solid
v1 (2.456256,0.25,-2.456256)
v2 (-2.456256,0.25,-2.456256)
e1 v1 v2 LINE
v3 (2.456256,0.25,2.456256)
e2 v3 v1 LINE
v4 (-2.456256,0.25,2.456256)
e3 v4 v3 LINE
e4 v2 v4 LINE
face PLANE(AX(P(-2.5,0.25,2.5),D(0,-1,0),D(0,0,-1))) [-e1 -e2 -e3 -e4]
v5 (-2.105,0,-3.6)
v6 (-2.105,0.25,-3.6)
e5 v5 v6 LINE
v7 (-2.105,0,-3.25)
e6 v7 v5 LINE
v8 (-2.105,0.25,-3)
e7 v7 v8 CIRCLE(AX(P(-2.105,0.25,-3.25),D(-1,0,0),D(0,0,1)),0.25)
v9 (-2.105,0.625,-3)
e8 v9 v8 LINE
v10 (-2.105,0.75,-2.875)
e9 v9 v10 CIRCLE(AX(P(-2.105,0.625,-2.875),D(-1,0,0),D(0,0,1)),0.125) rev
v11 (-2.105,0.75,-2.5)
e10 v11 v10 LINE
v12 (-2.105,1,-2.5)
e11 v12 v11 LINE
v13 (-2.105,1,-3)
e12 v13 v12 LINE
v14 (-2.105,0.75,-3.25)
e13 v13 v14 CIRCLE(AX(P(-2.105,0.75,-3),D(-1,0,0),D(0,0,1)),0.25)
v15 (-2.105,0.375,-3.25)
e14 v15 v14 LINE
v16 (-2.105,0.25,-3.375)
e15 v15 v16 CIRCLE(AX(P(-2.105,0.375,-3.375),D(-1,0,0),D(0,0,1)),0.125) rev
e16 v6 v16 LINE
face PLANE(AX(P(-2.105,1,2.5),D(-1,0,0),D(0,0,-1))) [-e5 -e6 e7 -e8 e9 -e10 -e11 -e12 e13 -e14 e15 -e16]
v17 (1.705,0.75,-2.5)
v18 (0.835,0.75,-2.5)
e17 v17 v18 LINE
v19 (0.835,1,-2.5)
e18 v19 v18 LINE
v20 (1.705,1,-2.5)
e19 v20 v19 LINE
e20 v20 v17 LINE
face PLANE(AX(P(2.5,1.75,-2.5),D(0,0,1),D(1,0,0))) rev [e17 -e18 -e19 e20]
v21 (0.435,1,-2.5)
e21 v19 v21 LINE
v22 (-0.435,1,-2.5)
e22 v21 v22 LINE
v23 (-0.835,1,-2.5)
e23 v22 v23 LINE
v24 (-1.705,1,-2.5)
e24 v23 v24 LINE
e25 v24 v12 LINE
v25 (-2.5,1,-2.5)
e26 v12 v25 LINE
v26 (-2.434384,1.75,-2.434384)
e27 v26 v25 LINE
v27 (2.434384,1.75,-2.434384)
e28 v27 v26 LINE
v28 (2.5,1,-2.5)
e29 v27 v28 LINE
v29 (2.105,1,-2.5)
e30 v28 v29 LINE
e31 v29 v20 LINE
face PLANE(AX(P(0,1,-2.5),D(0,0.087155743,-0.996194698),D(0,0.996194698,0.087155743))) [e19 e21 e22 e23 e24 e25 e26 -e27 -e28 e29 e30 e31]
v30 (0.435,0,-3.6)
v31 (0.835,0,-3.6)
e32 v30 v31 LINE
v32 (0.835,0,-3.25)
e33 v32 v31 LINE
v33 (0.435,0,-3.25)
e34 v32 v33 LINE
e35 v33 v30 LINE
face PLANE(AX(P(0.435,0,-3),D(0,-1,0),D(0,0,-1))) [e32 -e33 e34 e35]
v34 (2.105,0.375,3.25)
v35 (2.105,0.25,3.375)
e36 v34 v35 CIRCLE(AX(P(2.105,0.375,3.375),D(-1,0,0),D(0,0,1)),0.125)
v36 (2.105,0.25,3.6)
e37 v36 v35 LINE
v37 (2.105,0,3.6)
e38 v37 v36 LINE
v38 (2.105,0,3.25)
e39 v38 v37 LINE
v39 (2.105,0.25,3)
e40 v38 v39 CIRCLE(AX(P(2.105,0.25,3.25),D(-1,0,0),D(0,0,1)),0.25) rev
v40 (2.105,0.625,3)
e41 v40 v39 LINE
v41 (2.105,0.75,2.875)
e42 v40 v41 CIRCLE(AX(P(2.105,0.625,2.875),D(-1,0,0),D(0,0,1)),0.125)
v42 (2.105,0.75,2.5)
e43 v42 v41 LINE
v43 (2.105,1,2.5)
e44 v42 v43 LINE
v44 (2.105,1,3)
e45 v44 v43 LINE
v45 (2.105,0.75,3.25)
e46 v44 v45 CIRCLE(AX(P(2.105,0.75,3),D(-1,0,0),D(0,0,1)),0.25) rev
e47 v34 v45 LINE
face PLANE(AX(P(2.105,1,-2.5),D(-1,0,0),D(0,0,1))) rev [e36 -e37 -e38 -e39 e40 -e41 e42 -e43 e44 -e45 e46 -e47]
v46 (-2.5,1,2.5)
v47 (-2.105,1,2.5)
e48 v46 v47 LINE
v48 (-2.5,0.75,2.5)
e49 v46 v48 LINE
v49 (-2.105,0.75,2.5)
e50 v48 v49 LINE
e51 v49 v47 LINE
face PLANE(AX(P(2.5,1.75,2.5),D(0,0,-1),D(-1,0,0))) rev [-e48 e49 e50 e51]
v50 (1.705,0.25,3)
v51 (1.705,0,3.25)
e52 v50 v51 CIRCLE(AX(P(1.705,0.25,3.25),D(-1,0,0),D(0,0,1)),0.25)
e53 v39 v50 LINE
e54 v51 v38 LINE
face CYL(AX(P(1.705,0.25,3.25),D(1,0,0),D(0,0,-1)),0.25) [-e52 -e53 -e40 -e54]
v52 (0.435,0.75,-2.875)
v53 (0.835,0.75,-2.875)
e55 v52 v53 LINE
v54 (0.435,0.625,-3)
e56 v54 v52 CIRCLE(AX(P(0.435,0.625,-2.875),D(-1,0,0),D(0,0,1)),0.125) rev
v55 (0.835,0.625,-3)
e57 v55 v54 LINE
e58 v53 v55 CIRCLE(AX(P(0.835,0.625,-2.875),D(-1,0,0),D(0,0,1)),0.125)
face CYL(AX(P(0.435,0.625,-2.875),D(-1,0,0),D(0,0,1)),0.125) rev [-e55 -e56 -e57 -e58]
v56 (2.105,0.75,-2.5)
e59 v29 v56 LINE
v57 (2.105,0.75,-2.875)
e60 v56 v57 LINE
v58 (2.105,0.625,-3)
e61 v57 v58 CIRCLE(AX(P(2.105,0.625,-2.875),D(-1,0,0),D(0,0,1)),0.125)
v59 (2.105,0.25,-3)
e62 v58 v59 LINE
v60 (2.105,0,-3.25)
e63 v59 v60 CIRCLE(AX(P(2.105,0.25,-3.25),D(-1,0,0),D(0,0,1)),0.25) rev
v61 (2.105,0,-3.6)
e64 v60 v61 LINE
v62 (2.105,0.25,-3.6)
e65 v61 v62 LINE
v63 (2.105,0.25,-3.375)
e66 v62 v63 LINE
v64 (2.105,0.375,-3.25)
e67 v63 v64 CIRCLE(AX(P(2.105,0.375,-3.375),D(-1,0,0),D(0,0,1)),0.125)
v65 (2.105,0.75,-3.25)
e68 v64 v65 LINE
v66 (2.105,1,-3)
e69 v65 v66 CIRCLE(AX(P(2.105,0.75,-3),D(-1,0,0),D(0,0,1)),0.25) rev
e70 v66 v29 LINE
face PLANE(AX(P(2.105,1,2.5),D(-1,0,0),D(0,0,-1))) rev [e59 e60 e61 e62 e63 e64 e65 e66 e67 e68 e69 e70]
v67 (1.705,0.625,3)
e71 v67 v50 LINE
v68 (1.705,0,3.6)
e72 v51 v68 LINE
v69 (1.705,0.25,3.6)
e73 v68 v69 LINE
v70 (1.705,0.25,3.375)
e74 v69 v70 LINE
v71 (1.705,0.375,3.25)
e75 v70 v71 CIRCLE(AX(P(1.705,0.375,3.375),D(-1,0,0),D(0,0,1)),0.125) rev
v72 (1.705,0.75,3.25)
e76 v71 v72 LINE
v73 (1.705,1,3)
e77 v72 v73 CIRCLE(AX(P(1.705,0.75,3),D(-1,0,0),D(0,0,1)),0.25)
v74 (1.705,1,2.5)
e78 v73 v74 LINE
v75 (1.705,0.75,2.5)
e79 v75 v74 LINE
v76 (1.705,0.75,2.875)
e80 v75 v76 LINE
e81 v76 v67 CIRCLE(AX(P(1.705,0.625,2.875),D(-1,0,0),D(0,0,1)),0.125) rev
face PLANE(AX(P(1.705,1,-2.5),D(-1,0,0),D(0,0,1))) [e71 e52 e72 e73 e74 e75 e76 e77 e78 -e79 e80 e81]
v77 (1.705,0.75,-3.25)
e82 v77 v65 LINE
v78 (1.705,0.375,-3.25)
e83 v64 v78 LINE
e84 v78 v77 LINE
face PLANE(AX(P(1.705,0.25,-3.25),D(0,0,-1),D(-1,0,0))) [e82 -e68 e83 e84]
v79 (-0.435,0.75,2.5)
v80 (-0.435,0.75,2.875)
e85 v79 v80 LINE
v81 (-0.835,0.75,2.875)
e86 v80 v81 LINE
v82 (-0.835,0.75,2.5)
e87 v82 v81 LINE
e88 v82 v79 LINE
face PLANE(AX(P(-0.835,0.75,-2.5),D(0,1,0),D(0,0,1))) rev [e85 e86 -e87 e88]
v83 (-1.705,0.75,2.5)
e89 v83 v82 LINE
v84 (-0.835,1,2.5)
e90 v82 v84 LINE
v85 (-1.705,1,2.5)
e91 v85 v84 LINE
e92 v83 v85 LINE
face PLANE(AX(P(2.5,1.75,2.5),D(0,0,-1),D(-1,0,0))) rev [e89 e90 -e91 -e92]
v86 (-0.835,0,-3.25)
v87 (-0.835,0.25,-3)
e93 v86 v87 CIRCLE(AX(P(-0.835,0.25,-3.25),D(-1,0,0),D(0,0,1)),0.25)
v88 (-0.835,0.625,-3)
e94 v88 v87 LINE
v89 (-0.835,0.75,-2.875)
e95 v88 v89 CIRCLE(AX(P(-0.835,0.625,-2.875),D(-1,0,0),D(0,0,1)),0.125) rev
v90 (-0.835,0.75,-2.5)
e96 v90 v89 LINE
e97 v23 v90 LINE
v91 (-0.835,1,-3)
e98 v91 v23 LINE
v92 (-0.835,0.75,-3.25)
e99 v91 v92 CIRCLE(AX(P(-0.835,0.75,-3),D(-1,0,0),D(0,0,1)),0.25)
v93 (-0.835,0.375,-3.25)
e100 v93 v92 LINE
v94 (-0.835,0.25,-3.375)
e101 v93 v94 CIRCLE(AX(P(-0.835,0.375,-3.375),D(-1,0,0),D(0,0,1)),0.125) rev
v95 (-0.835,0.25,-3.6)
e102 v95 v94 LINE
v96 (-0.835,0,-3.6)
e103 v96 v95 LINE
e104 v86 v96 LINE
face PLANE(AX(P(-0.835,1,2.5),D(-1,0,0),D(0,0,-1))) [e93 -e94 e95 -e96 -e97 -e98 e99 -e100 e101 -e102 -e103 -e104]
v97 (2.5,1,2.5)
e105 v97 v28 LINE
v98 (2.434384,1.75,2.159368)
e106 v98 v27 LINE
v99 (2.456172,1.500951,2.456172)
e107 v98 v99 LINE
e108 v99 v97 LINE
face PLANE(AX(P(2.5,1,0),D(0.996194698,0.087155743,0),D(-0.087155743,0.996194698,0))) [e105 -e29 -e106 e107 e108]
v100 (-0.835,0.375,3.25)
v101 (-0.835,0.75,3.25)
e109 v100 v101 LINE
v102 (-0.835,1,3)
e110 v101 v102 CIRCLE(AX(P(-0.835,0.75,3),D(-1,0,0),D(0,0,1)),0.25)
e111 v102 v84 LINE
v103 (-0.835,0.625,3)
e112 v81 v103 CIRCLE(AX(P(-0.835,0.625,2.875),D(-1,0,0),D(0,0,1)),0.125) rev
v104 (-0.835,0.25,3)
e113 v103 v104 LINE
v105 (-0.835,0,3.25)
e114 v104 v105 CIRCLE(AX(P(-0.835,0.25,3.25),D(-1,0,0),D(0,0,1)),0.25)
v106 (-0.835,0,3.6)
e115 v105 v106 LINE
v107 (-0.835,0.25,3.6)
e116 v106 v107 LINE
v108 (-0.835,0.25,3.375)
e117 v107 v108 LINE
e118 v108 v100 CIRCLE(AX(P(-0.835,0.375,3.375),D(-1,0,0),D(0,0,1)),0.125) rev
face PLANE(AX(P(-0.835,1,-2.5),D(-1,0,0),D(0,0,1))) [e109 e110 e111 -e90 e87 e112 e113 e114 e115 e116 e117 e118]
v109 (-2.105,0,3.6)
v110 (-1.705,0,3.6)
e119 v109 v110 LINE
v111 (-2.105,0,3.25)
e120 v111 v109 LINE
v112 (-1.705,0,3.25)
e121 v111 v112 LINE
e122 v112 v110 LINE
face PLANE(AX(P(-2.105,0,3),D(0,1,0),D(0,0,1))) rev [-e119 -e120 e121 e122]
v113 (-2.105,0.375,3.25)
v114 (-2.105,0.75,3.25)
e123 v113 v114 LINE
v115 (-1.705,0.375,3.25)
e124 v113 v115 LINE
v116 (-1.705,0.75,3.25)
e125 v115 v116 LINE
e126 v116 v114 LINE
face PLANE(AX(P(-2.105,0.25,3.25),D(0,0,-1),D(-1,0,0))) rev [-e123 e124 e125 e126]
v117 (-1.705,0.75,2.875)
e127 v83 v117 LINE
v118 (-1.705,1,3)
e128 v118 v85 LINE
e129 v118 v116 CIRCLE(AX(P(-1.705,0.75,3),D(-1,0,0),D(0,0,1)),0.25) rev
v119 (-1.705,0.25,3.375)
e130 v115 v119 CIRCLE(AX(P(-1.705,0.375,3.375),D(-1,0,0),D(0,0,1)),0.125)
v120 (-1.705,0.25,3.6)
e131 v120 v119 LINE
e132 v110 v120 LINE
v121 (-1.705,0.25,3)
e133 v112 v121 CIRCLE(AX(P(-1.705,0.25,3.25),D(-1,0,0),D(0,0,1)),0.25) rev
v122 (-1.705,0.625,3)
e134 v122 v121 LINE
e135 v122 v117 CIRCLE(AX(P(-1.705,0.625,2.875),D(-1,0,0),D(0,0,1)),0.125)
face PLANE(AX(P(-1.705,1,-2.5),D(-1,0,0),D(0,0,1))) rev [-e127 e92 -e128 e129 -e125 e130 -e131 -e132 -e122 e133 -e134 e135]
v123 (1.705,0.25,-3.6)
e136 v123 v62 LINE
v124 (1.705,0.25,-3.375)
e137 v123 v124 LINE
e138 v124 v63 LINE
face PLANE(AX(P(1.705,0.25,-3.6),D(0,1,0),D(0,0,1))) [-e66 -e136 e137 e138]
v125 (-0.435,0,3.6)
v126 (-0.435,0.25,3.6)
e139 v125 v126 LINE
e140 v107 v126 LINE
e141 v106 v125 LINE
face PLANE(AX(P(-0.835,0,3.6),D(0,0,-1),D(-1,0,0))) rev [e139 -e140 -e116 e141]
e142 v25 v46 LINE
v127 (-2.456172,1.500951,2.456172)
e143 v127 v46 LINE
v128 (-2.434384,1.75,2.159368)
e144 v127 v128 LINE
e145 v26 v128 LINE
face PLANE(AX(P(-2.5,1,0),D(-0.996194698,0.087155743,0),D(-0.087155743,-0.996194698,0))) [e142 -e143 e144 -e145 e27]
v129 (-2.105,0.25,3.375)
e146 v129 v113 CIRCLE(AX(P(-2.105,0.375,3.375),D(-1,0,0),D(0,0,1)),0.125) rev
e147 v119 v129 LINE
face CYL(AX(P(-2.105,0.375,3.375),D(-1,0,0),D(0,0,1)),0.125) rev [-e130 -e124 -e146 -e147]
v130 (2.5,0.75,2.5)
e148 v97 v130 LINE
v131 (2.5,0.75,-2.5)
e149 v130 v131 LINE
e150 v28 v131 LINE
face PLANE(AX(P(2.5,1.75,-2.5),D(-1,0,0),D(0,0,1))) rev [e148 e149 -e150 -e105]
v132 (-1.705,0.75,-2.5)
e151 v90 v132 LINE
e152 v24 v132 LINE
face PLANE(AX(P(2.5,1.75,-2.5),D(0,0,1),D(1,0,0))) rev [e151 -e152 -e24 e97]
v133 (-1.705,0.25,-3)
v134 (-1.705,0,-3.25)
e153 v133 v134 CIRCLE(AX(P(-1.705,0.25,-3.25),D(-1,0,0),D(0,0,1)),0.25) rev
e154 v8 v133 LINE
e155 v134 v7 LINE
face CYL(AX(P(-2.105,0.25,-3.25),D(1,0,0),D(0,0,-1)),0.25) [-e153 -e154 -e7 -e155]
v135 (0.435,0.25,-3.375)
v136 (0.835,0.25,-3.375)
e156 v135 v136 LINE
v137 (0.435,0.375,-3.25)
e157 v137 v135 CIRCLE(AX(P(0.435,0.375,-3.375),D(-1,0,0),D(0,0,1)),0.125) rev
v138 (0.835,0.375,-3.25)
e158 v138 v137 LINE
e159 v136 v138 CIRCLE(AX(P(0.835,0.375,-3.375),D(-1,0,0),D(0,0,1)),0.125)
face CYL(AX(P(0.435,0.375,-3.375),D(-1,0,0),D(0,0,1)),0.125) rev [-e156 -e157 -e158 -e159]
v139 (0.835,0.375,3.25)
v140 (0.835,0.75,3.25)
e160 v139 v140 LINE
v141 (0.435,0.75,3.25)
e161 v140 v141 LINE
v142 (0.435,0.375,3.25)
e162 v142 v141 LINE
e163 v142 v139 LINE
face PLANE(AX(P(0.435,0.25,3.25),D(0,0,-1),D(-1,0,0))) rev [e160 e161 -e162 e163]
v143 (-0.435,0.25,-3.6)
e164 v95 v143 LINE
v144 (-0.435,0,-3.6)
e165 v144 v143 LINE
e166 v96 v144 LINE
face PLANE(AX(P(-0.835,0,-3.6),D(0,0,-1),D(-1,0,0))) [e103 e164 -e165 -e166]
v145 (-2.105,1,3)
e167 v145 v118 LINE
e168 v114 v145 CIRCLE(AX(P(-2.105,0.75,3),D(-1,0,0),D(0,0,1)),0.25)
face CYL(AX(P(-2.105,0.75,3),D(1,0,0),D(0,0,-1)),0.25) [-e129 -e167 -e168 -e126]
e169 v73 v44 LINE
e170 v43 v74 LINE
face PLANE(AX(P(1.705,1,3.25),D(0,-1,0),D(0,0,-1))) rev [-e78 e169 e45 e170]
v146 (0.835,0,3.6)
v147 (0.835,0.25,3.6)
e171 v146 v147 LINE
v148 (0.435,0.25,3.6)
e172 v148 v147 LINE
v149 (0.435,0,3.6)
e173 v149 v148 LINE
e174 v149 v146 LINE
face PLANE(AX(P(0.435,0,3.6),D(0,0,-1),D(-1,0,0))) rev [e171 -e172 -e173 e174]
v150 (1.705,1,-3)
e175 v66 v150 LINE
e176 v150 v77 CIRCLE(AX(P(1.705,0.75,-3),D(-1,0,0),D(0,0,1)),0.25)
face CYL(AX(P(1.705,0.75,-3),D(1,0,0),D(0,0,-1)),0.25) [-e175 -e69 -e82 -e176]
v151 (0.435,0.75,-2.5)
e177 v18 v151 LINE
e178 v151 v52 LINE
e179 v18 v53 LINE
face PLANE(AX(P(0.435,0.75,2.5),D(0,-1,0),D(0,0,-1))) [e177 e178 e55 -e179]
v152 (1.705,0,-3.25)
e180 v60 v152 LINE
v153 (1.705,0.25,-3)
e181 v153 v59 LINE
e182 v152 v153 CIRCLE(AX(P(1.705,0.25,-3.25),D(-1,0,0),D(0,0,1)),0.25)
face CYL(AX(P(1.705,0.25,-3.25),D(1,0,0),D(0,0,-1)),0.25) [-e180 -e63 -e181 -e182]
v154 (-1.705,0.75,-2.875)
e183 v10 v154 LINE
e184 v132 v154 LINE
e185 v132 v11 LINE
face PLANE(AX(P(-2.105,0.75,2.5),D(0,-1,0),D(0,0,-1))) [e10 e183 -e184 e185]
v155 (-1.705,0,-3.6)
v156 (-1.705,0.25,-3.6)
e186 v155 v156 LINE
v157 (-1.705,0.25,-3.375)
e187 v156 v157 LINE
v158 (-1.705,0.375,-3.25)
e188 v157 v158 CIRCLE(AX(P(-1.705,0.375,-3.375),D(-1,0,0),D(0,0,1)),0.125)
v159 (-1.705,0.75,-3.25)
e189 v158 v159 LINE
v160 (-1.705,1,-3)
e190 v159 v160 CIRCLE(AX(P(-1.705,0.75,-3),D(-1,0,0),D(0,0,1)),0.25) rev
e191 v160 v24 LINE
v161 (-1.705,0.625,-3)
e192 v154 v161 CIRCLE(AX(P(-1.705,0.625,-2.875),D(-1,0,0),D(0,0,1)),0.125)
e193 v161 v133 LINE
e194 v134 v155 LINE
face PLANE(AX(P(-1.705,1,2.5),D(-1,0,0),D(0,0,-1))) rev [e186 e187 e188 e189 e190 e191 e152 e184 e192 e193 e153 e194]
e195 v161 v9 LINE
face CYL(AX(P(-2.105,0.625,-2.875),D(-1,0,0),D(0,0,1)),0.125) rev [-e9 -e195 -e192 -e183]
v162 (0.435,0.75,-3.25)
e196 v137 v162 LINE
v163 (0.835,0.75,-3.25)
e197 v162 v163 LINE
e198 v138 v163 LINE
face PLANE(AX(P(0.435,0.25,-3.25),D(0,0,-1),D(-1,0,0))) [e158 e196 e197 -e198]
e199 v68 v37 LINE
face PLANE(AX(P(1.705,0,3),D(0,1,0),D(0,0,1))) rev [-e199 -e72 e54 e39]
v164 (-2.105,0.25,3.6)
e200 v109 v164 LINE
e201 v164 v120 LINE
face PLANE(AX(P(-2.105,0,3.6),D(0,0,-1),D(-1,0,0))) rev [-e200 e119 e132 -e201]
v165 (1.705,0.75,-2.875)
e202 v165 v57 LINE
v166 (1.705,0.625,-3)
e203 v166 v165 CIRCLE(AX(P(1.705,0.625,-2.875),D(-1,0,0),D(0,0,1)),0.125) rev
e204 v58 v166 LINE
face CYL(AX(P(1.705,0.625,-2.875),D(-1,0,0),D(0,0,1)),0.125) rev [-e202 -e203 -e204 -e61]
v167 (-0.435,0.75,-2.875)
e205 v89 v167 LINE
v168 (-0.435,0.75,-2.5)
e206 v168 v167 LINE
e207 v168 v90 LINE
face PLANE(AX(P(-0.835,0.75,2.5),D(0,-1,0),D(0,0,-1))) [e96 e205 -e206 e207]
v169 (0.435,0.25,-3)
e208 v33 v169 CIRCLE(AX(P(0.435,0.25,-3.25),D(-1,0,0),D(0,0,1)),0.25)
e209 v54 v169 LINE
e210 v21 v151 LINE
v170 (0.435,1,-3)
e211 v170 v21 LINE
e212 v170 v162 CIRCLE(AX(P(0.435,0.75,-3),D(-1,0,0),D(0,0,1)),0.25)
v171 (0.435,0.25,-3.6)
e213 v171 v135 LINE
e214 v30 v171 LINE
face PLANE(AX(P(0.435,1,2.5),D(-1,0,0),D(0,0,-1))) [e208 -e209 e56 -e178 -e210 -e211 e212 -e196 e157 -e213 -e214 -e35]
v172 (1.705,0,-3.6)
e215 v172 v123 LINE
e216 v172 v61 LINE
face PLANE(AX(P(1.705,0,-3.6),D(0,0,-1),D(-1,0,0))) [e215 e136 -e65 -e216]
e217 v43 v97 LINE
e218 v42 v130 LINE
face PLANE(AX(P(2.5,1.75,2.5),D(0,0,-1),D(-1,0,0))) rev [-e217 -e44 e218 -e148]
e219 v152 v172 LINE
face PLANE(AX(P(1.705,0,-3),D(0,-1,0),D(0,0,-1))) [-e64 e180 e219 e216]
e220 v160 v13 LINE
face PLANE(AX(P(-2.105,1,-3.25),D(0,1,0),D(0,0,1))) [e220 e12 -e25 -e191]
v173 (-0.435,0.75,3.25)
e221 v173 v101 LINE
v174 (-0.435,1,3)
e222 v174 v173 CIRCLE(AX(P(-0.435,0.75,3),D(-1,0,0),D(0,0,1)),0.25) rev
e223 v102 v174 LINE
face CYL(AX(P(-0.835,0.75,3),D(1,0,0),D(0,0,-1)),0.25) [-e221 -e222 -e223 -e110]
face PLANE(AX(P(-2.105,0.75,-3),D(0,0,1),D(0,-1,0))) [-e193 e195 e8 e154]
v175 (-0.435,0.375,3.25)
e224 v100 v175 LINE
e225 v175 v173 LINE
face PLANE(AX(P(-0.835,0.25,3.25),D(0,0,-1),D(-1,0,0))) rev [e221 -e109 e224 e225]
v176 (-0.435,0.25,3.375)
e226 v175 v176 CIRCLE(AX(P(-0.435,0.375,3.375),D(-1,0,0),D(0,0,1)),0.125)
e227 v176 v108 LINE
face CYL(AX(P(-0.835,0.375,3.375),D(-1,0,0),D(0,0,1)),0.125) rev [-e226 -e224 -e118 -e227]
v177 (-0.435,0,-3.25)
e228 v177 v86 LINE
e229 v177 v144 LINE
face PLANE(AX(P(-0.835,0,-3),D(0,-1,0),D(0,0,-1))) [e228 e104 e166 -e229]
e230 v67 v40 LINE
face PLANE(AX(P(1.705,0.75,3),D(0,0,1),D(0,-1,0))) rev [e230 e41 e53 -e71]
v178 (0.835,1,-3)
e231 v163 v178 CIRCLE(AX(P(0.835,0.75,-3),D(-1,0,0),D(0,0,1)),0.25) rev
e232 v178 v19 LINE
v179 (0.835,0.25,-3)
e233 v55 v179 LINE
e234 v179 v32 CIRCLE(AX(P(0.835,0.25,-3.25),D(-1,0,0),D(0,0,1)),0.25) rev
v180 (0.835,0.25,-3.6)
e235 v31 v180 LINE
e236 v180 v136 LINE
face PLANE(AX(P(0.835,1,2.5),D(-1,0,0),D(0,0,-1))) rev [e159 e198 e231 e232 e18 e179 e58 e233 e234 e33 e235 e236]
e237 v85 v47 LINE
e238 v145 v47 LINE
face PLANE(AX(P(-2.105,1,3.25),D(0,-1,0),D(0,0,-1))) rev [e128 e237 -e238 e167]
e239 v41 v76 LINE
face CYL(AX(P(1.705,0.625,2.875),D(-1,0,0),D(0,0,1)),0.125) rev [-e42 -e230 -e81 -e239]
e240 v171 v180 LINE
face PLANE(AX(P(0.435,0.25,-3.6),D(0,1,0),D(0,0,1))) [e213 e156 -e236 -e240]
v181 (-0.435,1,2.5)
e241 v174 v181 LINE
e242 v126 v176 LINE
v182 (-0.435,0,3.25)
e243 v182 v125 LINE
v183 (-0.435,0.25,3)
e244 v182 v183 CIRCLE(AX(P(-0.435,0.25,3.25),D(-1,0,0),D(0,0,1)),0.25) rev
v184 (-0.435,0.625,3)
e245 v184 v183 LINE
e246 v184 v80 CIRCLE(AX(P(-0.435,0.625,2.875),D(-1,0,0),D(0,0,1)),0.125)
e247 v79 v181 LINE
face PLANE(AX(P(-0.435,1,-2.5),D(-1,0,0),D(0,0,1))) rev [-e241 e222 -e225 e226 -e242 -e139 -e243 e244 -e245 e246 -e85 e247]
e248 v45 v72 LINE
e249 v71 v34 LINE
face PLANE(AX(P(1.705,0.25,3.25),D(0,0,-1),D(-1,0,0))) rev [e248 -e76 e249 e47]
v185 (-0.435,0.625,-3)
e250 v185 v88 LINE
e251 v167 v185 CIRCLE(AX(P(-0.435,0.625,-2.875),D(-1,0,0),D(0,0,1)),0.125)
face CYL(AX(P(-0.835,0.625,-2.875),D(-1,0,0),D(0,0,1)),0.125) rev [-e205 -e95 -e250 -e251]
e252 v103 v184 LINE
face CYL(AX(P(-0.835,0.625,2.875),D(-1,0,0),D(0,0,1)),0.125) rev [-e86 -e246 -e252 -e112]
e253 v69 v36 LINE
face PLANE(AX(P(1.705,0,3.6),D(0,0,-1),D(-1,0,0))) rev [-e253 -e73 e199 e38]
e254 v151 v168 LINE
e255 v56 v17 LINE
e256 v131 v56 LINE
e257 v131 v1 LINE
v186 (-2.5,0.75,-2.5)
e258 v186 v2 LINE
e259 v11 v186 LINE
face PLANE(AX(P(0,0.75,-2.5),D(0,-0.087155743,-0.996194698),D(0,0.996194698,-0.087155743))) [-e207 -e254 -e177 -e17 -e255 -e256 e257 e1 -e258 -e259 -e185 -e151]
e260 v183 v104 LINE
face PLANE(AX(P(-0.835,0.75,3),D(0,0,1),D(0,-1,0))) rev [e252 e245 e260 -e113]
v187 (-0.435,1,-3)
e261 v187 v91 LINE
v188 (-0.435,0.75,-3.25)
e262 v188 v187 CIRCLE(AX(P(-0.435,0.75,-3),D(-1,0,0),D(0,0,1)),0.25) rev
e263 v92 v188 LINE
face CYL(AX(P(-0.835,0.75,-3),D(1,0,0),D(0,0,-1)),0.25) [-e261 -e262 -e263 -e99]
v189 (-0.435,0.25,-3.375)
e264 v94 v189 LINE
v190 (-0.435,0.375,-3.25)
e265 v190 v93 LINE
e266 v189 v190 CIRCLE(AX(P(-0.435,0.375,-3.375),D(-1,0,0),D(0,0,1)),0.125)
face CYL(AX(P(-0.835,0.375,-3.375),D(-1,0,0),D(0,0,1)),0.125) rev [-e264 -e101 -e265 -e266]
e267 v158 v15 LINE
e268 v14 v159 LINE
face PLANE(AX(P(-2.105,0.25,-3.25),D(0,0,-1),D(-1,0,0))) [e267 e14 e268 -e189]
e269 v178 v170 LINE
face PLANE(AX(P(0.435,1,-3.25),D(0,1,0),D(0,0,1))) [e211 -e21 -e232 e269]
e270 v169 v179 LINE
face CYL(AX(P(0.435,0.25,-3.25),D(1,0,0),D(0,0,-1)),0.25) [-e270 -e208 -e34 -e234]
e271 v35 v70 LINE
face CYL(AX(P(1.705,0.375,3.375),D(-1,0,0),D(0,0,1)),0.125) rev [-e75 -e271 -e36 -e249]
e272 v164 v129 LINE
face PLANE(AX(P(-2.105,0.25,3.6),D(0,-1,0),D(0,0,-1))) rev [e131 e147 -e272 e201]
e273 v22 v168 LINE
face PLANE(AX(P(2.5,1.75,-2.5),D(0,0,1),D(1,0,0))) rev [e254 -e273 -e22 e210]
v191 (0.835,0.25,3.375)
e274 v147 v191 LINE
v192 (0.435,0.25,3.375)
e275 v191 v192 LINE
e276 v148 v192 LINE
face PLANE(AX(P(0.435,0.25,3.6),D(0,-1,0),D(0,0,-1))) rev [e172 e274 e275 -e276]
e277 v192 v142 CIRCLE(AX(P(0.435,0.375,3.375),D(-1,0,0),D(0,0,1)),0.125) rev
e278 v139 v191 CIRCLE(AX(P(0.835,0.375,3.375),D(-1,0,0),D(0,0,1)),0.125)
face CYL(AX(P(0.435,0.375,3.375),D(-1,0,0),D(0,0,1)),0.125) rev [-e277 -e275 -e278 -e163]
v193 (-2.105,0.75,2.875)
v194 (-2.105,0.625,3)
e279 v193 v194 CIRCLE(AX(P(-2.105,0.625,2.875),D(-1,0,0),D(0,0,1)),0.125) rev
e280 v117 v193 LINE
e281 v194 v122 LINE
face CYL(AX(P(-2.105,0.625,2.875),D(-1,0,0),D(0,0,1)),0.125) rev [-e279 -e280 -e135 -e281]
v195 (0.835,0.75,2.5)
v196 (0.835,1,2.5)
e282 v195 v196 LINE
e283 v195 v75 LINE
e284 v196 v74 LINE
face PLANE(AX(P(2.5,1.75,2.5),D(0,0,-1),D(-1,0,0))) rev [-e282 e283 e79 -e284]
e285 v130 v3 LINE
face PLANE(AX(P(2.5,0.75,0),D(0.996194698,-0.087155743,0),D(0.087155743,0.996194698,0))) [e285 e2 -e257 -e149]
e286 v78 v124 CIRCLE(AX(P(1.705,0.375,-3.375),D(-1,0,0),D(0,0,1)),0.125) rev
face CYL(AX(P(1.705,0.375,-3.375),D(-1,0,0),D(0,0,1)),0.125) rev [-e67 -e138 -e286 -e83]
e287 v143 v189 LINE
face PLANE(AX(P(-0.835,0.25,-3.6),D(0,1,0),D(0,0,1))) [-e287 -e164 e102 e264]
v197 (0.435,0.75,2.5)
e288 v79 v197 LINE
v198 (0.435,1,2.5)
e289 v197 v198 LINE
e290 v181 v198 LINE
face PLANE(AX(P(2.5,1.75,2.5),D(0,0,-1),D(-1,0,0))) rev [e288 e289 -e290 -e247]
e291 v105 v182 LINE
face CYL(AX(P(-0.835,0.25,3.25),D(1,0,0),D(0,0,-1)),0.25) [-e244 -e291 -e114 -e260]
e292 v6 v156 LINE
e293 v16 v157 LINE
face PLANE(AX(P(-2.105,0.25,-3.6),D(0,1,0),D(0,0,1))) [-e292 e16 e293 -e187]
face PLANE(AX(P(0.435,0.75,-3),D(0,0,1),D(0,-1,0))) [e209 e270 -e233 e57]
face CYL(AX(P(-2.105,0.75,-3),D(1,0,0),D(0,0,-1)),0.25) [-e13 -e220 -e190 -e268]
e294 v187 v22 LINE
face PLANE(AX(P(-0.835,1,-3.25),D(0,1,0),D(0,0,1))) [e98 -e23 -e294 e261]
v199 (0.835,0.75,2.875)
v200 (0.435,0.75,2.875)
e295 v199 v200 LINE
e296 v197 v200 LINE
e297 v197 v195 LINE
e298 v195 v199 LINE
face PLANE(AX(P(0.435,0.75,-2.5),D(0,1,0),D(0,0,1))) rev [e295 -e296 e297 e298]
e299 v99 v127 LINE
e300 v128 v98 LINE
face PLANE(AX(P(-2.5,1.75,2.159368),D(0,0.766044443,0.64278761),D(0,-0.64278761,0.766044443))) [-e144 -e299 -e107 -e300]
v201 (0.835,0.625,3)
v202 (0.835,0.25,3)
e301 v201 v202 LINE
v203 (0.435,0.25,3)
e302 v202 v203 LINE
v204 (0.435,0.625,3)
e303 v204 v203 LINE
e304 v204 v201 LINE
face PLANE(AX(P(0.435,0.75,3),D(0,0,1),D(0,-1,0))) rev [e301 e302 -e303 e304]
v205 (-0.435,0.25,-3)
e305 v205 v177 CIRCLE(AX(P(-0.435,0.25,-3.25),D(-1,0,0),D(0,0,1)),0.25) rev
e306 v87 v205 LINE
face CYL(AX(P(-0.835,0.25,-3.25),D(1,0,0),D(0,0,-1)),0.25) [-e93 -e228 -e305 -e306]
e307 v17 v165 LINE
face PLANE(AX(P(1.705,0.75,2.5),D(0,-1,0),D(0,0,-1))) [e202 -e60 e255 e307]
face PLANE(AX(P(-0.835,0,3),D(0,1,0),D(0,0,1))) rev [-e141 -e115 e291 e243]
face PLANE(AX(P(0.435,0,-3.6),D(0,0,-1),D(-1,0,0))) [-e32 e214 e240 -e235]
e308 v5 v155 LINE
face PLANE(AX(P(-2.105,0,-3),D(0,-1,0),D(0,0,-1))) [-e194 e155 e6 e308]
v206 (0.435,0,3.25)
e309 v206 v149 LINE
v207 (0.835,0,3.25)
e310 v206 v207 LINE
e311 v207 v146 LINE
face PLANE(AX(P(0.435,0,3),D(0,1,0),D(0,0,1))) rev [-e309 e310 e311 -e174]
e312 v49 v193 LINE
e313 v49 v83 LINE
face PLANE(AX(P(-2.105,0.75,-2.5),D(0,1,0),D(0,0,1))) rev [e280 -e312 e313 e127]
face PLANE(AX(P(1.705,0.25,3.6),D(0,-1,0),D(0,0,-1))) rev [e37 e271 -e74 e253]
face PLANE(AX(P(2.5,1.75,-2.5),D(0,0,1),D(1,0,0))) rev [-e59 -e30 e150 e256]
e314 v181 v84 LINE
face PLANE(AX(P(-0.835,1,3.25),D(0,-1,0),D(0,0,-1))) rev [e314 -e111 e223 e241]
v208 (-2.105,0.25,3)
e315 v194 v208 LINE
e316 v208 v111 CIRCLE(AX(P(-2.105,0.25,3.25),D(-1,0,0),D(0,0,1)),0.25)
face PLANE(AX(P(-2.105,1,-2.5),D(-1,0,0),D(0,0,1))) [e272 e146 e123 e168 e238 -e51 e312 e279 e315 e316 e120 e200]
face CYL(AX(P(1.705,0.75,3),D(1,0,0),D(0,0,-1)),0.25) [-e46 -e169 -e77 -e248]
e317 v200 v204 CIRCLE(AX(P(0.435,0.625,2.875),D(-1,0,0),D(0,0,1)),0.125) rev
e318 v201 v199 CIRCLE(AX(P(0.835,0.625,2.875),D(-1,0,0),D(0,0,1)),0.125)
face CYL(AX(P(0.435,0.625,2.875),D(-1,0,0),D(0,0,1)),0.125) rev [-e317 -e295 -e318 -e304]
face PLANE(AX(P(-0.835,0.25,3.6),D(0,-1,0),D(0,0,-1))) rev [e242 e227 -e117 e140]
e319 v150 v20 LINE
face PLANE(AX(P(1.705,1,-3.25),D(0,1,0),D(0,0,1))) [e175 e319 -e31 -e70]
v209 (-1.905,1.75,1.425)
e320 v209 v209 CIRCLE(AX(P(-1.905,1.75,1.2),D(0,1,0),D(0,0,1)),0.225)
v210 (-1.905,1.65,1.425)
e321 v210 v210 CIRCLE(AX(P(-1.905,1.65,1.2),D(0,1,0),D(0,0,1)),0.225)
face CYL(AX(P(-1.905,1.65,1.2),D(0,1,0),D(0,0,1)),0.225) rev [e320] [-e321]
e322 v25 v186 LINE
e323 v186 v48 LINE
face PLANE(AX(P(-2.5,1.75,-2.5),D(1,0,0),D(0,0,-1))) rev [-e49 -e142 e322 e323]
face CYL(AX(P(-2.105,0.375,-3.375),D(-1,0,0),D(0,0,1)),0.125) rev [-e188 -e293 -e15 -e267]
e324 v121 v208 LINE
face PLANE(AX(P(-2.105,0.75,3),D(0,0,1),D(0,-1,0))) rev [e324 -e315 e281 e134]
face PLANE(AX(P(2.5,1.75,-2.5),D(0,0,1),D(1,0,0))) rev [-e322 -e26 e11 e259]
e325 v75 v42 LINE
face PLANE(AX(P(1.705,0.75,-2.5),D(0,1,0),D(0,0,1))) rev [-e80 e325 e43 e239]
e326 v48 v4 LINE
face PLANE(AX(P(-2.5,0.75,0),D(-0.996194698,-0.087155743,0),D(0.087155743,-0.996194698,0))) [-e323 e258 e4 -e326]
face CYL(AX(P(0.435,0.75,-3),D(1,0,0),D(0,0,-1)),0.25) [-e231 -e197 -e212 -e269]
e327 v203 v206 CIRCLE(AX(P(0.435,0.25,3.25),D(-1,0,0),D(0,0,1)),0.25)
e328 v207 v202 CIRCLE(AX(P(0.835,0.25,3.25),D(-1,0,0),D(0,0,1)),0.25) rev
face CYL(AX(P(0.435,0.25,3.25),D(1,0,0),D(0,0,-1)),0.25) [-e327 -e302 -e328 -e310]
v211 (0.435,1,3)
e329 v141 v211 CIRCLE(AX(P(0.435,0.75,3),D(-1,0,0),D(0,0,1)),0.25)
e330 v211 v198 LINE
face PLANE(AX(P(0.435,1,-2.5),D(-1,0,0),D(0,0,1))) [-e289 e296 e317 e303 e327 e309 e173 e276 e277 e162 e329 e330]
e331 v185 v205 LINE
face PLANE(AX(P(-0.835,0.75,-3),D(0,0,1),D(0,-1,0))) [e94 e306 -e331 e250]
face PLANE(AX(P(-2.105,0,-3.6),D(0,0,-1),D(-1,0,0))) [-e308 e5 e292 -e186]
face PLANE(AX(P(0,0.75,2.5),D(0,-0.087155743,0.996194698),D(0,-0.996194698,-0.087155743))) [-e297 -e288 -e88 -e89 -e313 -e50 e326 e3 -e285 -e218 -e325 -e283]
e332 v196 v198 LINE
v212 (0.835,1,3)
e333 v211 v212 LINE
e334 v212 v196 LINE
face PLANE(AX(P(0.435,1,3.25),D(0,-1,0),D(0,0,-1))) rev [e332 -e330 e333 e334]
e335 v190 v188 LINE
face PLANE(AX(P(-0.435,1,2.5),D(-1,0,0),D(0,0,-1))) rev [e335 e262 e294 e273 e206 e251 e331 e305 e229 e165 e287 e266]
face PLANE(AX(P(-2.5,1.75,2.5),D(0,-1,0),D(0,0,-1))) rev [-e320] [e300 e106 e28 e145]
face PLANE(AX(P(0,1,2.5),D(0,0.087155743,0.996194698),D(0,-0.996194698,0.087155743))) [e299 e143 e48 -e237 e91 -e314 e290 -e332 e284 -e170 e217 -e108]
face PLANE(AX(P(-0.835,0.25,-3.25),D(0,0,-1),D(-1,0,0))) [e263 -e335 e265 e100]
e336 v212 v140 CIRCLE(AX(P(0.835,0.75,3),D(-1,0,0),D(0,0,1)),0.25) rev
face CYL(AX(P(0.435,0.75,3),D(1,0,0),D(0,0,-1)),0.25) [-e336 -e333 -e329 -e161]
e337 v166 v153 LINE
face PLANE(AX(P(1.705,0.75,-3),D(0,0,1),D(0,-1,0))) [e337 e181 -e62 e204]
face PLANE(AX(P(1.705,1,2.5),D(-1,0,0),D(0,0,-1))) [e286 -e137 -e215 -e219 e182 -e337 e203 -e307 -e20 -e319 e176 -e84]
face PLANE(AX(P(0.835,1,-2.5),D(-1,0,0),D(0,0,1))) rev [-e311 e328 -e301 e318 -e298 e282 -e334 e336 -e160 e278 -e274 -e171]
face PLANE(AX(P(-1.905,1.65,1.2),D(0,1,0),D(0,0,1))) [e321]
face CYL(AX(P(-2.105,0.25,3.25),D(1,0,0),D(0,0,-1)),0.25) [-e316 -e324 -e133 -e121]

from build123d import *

# Parameters (mm, degrees)
SKETCH2_W            = 5
SKETCH2_H            = 5
PACKAGE_DEPTH        = 1.5
DRAFT1_START         = -2.5
DRAFT1_DEPTH         = 5
DRAFT1_START_2       = -3
DRAFT1_2_DEPTH       = 6
DRAFT2_START         = -2.5
DRAFT2_DEPTH         = 5
DRAFT2_START_2       = -3
DRAFT2_2_DEPTH       = 6
CHAMFER1_SIZE        = 0.25
CHAMFER1_SIZE2       = 0.275015717
LEADS_DEPTH          = 0.2
FILLET1_R            = 0.25
FILLET2_R            = 0.125
FILLET1_OF_MIRROR1_R = 0.25
FILLET2_OF_MIRROR1_R = 0.125
LPATTERN1_START      = -0.835
LPATTERN1_DEPTH      = 0.4
LPATTERN1_START_2    = 0.435
LPATTERN1_2_DEPTH    = 0.4
LPATTERN1_START_3    = 1.705
LPATTERN1_3_DEPTH    = 0.4
SKETCH4_R            = 0.225
MARKER_DEPTH         = 0.1


with BuildPart() as part:
    # Sketch2 → Package (new body)
    with BuildSketch(Plane(origin=(0, 0.25, 0), x_dir=(-1, 0, 0), z_dir=(0, 1, 0))):
        Rectangle(SKETCH2_W, SKETCH2_H)
    extrude(amount=PACKAGE_DEPTH)

    # Draft1: read off the stored shape, not the designer's step
    # Draft1 outline → Draft1 (cut)
    with BuildSketch(Plane.YZ.offset(DRAFT1_START)):
        Polygon((1.75, -2.5), (1.75, -2.434383502), (1, -2.5), align=None)
        Polygon((1, 2.5), (1.75, 2.434383502), (1.75, 2.5), align=None)
    extrude(amount=DRAFT1_DEPTH, mode=Mode.SUBTRACT)

    # Draft1 2 outline → Draft1 2 (cut)
    with BuildSketch(Plane.XY.offset(DRAFT1_START_2)):
        Polygon((-2.5, 1), (-2.434383502, 1.75), (-2.5, 1.75), align=None)
        Polygon((2.434383502, 1.75), (2.5, 1), (2.5, 1.75), align=None)
    extrude(amount=DRAFT1_2_DEPTH, mode=Mode.SUBTRACT)

    # Draft2: read off the stored shape, not the designer's step
    # Draft2 outline → Draft2 (cut)
    with BuildSketch(Plane.XY.offset(DRAFT2_START)):
        Polygon((2.5, 0.75), (2.456255668, 0.25), (2.5, 0.25), align=None)
        Polygon((-2.456255668, 0.25), (-2.5, 0.75), (-2.5, 0.25), align=None)
    extrude(amount=DRAFT2_DEPTH, mode=Mode.SUBTRACT)

    # Draft2 2 outline → Draft2 2 (cut)
    with BuildSketch(Plane.YZ.offset(DRAFT2_START_2)):
        Polygon((0.75, -2.5), (0.25, -2.456255668), (0.25, -2.5), align=None)
        Polygon((0.25, 2.456255668), (0.75, 2.5), (0.25, 2.5), align=None)
    extrude(amount=DRAFT2_2_DEPTH, mode=Mode.SUBTRACT)

    # Chamfer1
    chamfer1_edges = [part.edges().sort_by_distance(p)[0] for p in [
        (0, 1.75, 2.434383502),
    ]]
    chamfer1_side = [part.faces().sort_by_distance(p)[0] for p in [
        (0, 1.373337774, 2.467337177),
    ]]
    chamfer(chamfer1_edges, length=CHAMFER1_SIZE, length2=CHAMFER1_SIZE2, reference=chamfer1_side[0])

    # Sketch3 → Leads (add, symmetric)
    with BuildSketch(Plane.ZY.offset(1.905)):
        Polygon((-2.5, 1), (-2.5, 0.75), (3, 0.75), (3, 0), (3.6, 0), (3.6, 0.25), (3.25, 0.25), (3.25, 1), align=None)
    leads = extrude(amount=LEADS_DEPTH, both=True)

    # Fillet1
    fillet1_edges = [part.edges().sort_by_distance(p)[0] for p in [
        (-1.905, 1, 3.25),
        (-1.905, 0, 3),
    ]]
    fillet(fillet1_edges, radius=FILLET1_R)

    # Fillet2
    fillet2_edges = [part.edges().sort_by_distance(p)[0] for p in [
        (-1.905, 0.75, 3),
        (-1.905, 0.25, 3.25),
    ]]
    fillet(fillet2_edges, radius=FILLET2_R)

    # Mirror1: Leads across plane
    add(leads.mirror(Plane.XY))

    # Fillet1 of Mirror1
    fillet1_of_mirror1_edges = [part.edges().sort_by_distance(p)[0] for p in [
        (-1.905, 1, -3.25),
        (-1.905, 0, -3),
    ]]
    fillet(fillet1_of_mirror1_edges, radius=FILLET1_OF_MIRROR1_R)

    # Fillet2 of Mirror1
    fillet2_of_mirror1_edges = [part.edges().sort_by_distance(p)[0] for p in [
        (-1.905, 0.75, -3),
        (-1.905, 0.25, -3.25),
    ]]
    fillet(fillet2_of_mirror1_edges, radius=FILLET2_OF_MIRROR1_R)

    # LPattern1: read off the stored shape, not the designer's step
    # LPattern1 outline → LPattern1 (add)
    with BuildSketch(Plane.YZ.offset(LPATTERN1_START)):
        with BuildLine():
            Line((1, 2.5), (1, 3))
            ThreePointArc((1, 3), (0.926776695, 3.176776695), (0.75, 3.25))
            Line((0.75, 3.25), (0.375, 3.25))
            ThreePointArc((0.375, 3.25), (0.286611652, 3.286611652), (0.25, 3.375))
            Line((0.25, 3.375), (0.25, 3.6))
            Line((0.25, 3.6), (0, 3.6))
            Line((0, 3.6), (0, 3.25))
            ThreePointArc((0, 3.25), (0.073223305, 3.073223305), (0.25, 3))
            Line((0.25, 3), (0.625, 3))
            ThreePointArc((0.625, 3), (0.713388348, 2.963388348), (0.75, 2.875))
            Line((0.75, 2.875), (0.75, 2.5))
            Line((0.75, 2.5), (1, 2.5))
        make_face()
        with BuildLine():
            ThreePointArc((0.75, -3.25), (0.926776695, -3.176776695), (1, -3))
            Line((1, -3), (1, -2.5))
            Line((1, -2.5), (0.75, -2.5))
            Line((0.75, -2.5), (0.75, -2.875))
            ThreePointArc((0.75, -2.875), (0.713388348, -2.963388348), (0.625, -3))
            Line((0.625, -3), (0.25, -3))
            ThreePointArc((0.25, -3), (0.073223305, -3.073223305), (0, -3.25))
            Line((0, -3.25), (0, -3.6))
            Line((0, -3.6), (0.25, -3.6))
            Line((0.25, -3.6), (0.25, -3.375))
            ThreePointArc((0.25, -3.375), (0.286611652, -3.286611652), (0.375, -3.25))
            Line((0.375, -3.25), (0.75, -3.25))
        make_face()
    extrude(amount=LPATTERN1_DEPTH)

    # LPattern1 2 outline → LPattern1 2 (add)
    with BuildSketch(Plane.YZ.offset(LPATTERN1_START_2)):
        with BuildLine():
            Line((1, 2.5), (1, 3))
            ThreePointArc((1, 3), (0.926776695, 3.176776695), (0.75, 3.25))
            Line((0.75, 3.25), (0.375, 3.25))
            ThreePointArc((0.375, 3.25), (0.286611652, 3.286611652), (0.25, 3.375))
            Line((0.25, 3.375), (0.25, 3.6))
            Line((0.25, 3.6), (0, 3.6))
            Line((0, 3.6), (0, 3.25))
            ThreePointArc((0, 3.25), (0.073223305, 3.073223305), (0.25, 3))
            Line((0.25, 3), (0.625, 3))
            ThreePointArc((0.625, 3), (0.713388348, 2.963388348), (0.75, 2.875))
            Line((0.75, 2.875), (0.75, 2.5))
            Line((0.75, 2.5), (1, 2.5))
        make_face()
        with BuildLine():
            ThreePointArc((0.75, -3.25), (0.926776695, -3.176776695), (1, -3))
            Line((1, -3), (1, -2.5))
            Line((1, -2.5), (0.75, -2.5))
            Line((0.75, -2.5), (0.75, -2.875))
            ThreePointArc((0.75, -2.875), (0.713388348, -2.963388348), (0.625, -3))
            Line((0.625, -3), (0.25, -3))
            ThreePointArc((0.25, -3), (0.073223305, -3.073223305), (0, -3.25))
            Line((0, -3.25), (0, -3.6))
            Line((0, -3.6), (0.25, -3.6))
            Line((0.25, -3.6), (0.25, -3.375))
            ThreePointArc((0.25, -3.375), (0.286611652, -3.286611652), (0.375, -3.25))
            Line((0.375, -3.25), (0.75, -3.25))
        make_face()
    extrude(amount=LPATTERN1_2_DEPTH)

    # LPattern1 3 outline → LPattern1 3 (add)
    with BuildSketch(Plane.YZ.offset(LPATTERN1_START_3)):
        with BuildLine():
            Line((1, 2.5), (1, 3))
            ThreePointArc((1, 3), (0.926776695, 3.176776695), (0.75, 3.25))
            Line((0.75, 3.25), (0.375, 3.25))
            ThreePointArc((0.375, 3.25), (0.286611652, 3.286611652), (0.25, 3.375))
            Line((0.25, 3.375), (0.25, 3.6))
            Line((0.25, 3.6), (0, 3.6))
            Line((0, 3.6), (0, 3.25))
            ThreePointArc((0, 3.25), (0.073223305, 3.073223305), (0.25, 3))
            Line((0.25, 3), (0.625, 3))
            ThreePointArc((0.625, 3), (0.713388348, 2.963388348), (0.75, 2.875))
            Line((0.75, 2.875), (0.75, 2.5))
            Line((0.75, 2.5), (1, 2.5))
        make_face()
        with BuildLine():
            ThreePointArc((0.75, -3.25), (0.926776695, -3.176776695), (1, -3))
            Line((1, -3), (1, -2.5))
            Line((1, -2.5), (0.75, -2.5))
            Line((0.75, -2.5), (0.75, -2.875))
            ThreePointArc((0.75, -2.875), (0.713388348, -2.963388348), (0.625, -3))
            Line((0.625, -3), (0.25, -3))
            ThreePointArc((0.25, -3), (0.073223305, -3.073223305), (0, -3.25))
            Line((0, -3.25), (0, -3.6))
            Line((0, -3.6), (0.25, -3.6))
            Line((0.25, -3.6), (0.25, -3.375))
            ThreePointArc((0.25, -3.375), (0.286611652, -3.286611652), (0.375, -3.25))
            Line((0.375, -3.25), (0.75, -3.25))
        make_face()
    extrude(amount=LPATTERN1_3_DEPTH)

    # Sketch4 → Marker (cut)
    with BuildSketch(Plane(origin=(0, 1.75, 0), x_dir=(1, 0, 0), z_dir=(0, 1, 0))):
        with Locations(Location((-1.905, -1.2, 0), (0, 0, 270))):
            Circle(SKETCH4_R)
    extrude(amount=-MARKER_DEPTH, mode=Mode.SUBTRACT)


solid = part.part
